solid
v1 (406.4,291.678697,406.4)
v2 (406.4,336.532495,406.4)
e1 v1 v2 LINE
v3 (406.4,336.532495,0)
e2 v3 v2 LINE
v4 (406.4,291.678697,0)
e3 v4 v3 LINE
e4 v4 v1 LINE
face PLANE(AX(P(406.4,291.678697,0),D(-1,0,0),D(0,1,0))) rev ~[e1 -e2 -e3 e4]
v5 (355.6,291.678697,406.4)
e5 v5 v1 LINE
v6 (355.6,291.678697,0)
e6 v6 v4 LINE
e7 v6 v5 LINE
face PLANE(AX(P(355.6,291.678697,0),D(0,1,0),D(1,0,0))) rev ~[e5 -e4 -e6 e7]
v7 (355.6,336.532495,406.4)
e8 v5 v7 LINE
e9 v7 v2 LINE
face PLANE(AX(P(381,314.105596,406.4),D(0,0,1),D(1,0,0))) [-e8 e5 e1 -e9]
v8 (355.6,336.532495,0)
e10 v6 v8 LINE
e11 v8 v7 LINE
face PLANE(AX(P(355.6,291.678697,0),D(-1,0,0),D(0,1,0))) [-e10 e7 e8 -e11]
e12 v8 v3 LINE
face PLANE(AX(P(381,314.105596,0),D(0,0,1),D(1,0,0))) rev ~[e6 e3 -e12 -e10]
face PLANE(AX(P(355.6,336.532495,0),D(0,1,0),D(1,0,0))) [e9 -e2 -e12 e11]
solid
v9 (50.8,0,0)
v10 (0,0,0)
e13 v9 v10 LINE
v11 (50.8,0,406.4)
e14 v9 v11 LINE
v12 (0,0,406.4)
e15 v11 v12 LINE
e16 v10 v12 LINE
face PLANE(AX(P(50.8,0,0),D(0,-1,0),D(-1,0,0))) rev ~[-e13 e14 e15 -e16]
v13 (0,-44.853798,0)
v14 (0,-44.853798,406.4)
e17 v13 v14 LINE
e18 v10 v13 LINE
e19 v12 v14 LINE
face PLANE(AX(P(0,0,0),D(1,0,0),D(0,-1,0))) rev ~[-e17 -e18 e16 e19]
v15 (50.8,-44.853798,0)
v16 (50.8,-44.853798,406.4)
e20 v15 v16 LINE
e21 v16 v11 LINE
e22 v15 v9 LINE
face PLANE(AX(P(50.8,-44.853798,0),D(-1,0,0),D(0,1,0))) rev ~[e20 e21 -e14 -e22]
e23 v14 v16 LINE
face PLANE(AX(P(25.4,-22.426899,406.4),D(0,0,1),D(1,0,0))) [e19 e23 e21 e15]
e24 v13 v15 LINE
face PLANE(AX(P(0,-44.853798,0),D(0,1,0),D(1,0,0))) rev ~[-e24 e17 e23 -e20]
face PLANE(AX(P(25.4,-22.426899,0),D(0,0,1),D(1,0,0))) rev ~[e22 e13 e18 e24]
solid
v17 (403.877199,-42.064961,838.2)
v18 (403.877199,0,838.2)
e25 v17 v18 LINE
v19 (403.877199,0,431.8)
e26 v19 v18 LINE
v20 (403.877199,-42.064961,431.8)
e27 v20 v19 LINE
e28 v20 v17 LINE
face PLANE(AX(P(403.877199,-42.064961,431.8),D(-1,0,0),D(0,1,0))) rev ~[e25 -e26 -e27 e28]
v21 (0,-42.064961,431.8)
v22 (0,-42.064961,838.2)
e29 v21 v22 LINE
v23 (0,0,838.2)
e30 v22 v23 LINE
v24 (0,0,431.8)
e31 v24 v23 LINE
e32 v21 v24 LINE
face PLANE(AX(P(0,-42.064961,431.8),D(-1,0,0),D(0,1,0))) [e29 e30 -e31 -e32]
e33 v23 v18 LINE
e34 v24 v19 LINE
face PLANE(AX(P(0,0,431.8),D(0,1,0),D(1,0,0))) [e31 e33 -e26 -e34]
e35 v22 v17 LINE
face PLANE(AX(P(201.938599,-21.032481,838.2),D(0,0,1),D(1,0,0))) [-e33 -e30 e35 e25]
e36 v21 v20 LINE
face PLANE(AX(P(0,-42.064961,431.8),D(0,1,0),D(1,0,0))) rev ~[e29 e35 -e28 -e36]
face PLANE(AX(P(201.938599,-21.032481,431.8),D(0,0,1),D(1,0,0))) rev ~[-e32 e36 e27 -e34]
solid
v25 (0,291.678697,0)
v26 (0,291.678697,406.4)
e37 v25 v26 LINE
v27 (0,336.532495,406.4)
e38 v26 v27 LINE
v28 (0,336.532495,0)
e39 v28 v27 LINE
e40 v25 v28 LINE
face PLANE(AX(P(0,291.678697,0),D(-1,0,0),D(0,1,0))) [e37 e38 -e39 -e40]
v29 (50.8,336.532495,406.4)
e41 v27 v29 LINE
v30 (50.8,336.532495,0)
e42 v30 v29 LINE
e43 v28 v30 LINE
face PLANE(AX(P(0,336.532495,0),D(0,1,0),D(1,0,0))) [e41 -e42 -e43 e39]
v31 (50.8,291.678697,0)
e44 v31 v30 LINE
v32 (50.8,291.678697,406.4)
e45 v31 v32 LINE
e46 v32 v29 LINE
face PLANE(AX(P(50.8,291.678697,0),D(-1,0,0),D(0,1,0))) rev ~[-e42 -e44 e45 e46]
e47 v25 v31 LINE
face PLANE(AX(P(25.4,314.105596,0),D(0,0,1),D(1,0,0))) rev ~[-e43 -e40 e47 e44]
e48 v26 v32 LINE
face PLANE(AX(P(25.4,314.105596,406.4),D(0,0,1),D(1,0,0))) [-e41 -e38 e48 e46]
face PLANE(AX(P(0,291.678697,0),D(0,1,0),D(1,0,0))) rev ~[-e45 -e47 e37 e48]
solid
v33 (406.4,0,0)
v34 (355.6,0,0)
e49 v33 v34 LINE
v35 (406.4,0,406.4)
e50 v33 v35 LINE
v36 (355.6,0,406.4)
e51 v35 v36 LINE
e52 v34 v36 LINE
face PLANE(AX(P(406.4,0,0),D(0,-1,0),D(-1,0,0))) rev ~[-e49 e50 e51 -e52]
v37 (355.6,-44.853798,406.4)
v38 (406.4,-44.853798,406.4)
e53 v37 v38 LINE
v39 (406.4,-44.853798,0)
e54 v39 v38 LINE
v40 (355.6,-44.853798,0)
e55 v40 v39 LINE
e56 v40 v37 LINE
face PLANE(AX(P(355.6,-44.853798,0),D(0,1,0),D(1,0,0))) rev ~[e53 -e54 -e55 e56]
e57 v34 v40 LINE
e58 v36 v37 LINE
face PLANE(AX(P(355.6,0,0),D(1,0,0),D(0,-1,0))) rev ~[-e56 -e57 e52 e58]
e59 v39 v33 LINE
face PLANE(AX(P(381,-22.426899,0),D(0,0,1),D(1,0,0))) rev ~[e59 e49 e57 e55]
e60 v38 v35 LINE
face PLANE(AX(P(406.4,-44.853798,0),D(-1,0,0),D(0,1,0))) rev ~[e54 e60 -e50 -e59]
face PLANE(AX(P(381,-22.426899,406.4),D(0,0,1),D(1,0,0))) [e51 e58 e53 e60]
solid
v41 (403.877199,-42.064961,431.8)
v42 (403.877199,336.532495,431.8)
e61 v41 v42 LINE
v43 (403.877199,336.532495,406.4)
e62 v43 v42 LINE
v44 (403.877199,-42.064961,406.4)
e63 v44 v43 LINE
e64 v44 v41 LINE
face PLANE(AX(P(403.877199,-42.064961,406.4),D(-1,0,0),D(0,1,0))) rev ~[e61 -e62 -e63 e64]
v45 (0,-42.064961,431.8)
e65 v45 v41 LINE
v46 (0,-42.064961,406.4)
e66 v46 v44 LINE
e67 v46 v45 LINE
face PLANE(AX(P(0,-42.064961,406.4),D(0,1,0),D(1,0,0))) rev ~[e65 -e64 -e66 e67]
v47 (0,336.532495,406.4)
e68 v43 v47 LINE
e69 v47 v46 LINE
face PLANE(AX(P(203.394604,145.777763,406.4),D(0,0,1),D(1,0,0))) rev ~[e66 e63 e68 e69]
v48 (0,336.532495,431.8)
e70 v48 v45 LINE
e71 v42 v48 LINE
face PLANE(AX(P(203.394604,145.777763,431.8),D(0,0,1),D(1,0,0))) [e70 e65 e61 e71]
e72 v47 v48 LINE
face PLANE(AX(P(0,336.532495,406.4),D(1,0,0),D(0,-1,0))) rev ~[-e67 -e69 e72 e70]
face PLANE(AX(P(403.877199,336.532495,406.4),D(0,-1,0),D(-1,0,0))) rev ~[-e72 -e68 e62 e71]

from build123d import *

# Parameters (mm, degrees)
F1_DEPTH = 406.4
F0_W     = 50.8
F0_H     = 44.8537981102
F2_W     = 50.8
F2_H     = 44.8537981102
F3_DEPTH = 25.4
F4_W     = 403.8771986961
F4_H     = 42.064961046
F5_DEPTH = 406.4


# Not quite as in the source:
# - a feature names something its author has since deleted; it is built from what else it names


with BuildPart() as f1:
    # F0 (on Top) → F1 (new body)
    with BuildSketch(Plane.XY):
        Polygon((50.8, 0), (0, 0), (0, -44.8537981102), (50.8, -44.8537981102), (50.8, -22.4268990551), align=None)
    extrude(amount=F1_DEPTH)


with BuildPart() as f1b:
    # F0 (on Top) → F1, piece 2 (new body)
    with BuildSketch(Plane.XY):
        with Locations((381, 314.1055959259)):
            Rectangle(F0_W, F0_H)
    extrude(amount=F1_DEPTH)


with BuildPart() as f1c:
    # F0 (on Top) → F1, piece 3 (new body)
    with BuildSketch(Plane.XY):
        Polygon((355.6, 0), (355.6, -22.4268990551), (355.6, -44.8537981102), (406.4, -44.8537981102), (406.4, 0), align=None)
    extrude(amount=F1_DEPTH)


with BuildPart() as f1d:
    # F0 (on Top) → F1, piece 4 (new body)
    with BuildSketch(Plane.XY):
        with Locations((25.4, 314.1055959259)):
            Rectangle(F0_W, F0_H)
    extrude(amount=F1_DEPTH)


with BuildPart() as f3:
    # F2 (on face) → F3 (new body)
    with BuildSketch(Plane.XY.offset(406.4)):
        Polygon((50.8, 291.6786968708), (0, 291.6786968708), (0, -42.064961046), (403.8771986961, -42.064961046), (403.8771986961, 336.532494981), (50.8, 336.532494981), align=None)
        with Locations((25.4, 314.1055959259)):
            Rectangle(F2_W, F2_H)
    extrude(amount=F3_DEPTH)


with BuildPart() as f5:
    # F4 (on face) → F5 (new body)
    with BuildSketch(Plane.XY.offset(431.8)):
        with Locations((201.9385993481, -21.032480523)):
            Rectangle(F4_W, F4_H)
    extrude(amount=F5_DEPTH)


solid = Compound([f1.part, f1b.part, f1c.part, f1d.part, f3.part, f5.part])
